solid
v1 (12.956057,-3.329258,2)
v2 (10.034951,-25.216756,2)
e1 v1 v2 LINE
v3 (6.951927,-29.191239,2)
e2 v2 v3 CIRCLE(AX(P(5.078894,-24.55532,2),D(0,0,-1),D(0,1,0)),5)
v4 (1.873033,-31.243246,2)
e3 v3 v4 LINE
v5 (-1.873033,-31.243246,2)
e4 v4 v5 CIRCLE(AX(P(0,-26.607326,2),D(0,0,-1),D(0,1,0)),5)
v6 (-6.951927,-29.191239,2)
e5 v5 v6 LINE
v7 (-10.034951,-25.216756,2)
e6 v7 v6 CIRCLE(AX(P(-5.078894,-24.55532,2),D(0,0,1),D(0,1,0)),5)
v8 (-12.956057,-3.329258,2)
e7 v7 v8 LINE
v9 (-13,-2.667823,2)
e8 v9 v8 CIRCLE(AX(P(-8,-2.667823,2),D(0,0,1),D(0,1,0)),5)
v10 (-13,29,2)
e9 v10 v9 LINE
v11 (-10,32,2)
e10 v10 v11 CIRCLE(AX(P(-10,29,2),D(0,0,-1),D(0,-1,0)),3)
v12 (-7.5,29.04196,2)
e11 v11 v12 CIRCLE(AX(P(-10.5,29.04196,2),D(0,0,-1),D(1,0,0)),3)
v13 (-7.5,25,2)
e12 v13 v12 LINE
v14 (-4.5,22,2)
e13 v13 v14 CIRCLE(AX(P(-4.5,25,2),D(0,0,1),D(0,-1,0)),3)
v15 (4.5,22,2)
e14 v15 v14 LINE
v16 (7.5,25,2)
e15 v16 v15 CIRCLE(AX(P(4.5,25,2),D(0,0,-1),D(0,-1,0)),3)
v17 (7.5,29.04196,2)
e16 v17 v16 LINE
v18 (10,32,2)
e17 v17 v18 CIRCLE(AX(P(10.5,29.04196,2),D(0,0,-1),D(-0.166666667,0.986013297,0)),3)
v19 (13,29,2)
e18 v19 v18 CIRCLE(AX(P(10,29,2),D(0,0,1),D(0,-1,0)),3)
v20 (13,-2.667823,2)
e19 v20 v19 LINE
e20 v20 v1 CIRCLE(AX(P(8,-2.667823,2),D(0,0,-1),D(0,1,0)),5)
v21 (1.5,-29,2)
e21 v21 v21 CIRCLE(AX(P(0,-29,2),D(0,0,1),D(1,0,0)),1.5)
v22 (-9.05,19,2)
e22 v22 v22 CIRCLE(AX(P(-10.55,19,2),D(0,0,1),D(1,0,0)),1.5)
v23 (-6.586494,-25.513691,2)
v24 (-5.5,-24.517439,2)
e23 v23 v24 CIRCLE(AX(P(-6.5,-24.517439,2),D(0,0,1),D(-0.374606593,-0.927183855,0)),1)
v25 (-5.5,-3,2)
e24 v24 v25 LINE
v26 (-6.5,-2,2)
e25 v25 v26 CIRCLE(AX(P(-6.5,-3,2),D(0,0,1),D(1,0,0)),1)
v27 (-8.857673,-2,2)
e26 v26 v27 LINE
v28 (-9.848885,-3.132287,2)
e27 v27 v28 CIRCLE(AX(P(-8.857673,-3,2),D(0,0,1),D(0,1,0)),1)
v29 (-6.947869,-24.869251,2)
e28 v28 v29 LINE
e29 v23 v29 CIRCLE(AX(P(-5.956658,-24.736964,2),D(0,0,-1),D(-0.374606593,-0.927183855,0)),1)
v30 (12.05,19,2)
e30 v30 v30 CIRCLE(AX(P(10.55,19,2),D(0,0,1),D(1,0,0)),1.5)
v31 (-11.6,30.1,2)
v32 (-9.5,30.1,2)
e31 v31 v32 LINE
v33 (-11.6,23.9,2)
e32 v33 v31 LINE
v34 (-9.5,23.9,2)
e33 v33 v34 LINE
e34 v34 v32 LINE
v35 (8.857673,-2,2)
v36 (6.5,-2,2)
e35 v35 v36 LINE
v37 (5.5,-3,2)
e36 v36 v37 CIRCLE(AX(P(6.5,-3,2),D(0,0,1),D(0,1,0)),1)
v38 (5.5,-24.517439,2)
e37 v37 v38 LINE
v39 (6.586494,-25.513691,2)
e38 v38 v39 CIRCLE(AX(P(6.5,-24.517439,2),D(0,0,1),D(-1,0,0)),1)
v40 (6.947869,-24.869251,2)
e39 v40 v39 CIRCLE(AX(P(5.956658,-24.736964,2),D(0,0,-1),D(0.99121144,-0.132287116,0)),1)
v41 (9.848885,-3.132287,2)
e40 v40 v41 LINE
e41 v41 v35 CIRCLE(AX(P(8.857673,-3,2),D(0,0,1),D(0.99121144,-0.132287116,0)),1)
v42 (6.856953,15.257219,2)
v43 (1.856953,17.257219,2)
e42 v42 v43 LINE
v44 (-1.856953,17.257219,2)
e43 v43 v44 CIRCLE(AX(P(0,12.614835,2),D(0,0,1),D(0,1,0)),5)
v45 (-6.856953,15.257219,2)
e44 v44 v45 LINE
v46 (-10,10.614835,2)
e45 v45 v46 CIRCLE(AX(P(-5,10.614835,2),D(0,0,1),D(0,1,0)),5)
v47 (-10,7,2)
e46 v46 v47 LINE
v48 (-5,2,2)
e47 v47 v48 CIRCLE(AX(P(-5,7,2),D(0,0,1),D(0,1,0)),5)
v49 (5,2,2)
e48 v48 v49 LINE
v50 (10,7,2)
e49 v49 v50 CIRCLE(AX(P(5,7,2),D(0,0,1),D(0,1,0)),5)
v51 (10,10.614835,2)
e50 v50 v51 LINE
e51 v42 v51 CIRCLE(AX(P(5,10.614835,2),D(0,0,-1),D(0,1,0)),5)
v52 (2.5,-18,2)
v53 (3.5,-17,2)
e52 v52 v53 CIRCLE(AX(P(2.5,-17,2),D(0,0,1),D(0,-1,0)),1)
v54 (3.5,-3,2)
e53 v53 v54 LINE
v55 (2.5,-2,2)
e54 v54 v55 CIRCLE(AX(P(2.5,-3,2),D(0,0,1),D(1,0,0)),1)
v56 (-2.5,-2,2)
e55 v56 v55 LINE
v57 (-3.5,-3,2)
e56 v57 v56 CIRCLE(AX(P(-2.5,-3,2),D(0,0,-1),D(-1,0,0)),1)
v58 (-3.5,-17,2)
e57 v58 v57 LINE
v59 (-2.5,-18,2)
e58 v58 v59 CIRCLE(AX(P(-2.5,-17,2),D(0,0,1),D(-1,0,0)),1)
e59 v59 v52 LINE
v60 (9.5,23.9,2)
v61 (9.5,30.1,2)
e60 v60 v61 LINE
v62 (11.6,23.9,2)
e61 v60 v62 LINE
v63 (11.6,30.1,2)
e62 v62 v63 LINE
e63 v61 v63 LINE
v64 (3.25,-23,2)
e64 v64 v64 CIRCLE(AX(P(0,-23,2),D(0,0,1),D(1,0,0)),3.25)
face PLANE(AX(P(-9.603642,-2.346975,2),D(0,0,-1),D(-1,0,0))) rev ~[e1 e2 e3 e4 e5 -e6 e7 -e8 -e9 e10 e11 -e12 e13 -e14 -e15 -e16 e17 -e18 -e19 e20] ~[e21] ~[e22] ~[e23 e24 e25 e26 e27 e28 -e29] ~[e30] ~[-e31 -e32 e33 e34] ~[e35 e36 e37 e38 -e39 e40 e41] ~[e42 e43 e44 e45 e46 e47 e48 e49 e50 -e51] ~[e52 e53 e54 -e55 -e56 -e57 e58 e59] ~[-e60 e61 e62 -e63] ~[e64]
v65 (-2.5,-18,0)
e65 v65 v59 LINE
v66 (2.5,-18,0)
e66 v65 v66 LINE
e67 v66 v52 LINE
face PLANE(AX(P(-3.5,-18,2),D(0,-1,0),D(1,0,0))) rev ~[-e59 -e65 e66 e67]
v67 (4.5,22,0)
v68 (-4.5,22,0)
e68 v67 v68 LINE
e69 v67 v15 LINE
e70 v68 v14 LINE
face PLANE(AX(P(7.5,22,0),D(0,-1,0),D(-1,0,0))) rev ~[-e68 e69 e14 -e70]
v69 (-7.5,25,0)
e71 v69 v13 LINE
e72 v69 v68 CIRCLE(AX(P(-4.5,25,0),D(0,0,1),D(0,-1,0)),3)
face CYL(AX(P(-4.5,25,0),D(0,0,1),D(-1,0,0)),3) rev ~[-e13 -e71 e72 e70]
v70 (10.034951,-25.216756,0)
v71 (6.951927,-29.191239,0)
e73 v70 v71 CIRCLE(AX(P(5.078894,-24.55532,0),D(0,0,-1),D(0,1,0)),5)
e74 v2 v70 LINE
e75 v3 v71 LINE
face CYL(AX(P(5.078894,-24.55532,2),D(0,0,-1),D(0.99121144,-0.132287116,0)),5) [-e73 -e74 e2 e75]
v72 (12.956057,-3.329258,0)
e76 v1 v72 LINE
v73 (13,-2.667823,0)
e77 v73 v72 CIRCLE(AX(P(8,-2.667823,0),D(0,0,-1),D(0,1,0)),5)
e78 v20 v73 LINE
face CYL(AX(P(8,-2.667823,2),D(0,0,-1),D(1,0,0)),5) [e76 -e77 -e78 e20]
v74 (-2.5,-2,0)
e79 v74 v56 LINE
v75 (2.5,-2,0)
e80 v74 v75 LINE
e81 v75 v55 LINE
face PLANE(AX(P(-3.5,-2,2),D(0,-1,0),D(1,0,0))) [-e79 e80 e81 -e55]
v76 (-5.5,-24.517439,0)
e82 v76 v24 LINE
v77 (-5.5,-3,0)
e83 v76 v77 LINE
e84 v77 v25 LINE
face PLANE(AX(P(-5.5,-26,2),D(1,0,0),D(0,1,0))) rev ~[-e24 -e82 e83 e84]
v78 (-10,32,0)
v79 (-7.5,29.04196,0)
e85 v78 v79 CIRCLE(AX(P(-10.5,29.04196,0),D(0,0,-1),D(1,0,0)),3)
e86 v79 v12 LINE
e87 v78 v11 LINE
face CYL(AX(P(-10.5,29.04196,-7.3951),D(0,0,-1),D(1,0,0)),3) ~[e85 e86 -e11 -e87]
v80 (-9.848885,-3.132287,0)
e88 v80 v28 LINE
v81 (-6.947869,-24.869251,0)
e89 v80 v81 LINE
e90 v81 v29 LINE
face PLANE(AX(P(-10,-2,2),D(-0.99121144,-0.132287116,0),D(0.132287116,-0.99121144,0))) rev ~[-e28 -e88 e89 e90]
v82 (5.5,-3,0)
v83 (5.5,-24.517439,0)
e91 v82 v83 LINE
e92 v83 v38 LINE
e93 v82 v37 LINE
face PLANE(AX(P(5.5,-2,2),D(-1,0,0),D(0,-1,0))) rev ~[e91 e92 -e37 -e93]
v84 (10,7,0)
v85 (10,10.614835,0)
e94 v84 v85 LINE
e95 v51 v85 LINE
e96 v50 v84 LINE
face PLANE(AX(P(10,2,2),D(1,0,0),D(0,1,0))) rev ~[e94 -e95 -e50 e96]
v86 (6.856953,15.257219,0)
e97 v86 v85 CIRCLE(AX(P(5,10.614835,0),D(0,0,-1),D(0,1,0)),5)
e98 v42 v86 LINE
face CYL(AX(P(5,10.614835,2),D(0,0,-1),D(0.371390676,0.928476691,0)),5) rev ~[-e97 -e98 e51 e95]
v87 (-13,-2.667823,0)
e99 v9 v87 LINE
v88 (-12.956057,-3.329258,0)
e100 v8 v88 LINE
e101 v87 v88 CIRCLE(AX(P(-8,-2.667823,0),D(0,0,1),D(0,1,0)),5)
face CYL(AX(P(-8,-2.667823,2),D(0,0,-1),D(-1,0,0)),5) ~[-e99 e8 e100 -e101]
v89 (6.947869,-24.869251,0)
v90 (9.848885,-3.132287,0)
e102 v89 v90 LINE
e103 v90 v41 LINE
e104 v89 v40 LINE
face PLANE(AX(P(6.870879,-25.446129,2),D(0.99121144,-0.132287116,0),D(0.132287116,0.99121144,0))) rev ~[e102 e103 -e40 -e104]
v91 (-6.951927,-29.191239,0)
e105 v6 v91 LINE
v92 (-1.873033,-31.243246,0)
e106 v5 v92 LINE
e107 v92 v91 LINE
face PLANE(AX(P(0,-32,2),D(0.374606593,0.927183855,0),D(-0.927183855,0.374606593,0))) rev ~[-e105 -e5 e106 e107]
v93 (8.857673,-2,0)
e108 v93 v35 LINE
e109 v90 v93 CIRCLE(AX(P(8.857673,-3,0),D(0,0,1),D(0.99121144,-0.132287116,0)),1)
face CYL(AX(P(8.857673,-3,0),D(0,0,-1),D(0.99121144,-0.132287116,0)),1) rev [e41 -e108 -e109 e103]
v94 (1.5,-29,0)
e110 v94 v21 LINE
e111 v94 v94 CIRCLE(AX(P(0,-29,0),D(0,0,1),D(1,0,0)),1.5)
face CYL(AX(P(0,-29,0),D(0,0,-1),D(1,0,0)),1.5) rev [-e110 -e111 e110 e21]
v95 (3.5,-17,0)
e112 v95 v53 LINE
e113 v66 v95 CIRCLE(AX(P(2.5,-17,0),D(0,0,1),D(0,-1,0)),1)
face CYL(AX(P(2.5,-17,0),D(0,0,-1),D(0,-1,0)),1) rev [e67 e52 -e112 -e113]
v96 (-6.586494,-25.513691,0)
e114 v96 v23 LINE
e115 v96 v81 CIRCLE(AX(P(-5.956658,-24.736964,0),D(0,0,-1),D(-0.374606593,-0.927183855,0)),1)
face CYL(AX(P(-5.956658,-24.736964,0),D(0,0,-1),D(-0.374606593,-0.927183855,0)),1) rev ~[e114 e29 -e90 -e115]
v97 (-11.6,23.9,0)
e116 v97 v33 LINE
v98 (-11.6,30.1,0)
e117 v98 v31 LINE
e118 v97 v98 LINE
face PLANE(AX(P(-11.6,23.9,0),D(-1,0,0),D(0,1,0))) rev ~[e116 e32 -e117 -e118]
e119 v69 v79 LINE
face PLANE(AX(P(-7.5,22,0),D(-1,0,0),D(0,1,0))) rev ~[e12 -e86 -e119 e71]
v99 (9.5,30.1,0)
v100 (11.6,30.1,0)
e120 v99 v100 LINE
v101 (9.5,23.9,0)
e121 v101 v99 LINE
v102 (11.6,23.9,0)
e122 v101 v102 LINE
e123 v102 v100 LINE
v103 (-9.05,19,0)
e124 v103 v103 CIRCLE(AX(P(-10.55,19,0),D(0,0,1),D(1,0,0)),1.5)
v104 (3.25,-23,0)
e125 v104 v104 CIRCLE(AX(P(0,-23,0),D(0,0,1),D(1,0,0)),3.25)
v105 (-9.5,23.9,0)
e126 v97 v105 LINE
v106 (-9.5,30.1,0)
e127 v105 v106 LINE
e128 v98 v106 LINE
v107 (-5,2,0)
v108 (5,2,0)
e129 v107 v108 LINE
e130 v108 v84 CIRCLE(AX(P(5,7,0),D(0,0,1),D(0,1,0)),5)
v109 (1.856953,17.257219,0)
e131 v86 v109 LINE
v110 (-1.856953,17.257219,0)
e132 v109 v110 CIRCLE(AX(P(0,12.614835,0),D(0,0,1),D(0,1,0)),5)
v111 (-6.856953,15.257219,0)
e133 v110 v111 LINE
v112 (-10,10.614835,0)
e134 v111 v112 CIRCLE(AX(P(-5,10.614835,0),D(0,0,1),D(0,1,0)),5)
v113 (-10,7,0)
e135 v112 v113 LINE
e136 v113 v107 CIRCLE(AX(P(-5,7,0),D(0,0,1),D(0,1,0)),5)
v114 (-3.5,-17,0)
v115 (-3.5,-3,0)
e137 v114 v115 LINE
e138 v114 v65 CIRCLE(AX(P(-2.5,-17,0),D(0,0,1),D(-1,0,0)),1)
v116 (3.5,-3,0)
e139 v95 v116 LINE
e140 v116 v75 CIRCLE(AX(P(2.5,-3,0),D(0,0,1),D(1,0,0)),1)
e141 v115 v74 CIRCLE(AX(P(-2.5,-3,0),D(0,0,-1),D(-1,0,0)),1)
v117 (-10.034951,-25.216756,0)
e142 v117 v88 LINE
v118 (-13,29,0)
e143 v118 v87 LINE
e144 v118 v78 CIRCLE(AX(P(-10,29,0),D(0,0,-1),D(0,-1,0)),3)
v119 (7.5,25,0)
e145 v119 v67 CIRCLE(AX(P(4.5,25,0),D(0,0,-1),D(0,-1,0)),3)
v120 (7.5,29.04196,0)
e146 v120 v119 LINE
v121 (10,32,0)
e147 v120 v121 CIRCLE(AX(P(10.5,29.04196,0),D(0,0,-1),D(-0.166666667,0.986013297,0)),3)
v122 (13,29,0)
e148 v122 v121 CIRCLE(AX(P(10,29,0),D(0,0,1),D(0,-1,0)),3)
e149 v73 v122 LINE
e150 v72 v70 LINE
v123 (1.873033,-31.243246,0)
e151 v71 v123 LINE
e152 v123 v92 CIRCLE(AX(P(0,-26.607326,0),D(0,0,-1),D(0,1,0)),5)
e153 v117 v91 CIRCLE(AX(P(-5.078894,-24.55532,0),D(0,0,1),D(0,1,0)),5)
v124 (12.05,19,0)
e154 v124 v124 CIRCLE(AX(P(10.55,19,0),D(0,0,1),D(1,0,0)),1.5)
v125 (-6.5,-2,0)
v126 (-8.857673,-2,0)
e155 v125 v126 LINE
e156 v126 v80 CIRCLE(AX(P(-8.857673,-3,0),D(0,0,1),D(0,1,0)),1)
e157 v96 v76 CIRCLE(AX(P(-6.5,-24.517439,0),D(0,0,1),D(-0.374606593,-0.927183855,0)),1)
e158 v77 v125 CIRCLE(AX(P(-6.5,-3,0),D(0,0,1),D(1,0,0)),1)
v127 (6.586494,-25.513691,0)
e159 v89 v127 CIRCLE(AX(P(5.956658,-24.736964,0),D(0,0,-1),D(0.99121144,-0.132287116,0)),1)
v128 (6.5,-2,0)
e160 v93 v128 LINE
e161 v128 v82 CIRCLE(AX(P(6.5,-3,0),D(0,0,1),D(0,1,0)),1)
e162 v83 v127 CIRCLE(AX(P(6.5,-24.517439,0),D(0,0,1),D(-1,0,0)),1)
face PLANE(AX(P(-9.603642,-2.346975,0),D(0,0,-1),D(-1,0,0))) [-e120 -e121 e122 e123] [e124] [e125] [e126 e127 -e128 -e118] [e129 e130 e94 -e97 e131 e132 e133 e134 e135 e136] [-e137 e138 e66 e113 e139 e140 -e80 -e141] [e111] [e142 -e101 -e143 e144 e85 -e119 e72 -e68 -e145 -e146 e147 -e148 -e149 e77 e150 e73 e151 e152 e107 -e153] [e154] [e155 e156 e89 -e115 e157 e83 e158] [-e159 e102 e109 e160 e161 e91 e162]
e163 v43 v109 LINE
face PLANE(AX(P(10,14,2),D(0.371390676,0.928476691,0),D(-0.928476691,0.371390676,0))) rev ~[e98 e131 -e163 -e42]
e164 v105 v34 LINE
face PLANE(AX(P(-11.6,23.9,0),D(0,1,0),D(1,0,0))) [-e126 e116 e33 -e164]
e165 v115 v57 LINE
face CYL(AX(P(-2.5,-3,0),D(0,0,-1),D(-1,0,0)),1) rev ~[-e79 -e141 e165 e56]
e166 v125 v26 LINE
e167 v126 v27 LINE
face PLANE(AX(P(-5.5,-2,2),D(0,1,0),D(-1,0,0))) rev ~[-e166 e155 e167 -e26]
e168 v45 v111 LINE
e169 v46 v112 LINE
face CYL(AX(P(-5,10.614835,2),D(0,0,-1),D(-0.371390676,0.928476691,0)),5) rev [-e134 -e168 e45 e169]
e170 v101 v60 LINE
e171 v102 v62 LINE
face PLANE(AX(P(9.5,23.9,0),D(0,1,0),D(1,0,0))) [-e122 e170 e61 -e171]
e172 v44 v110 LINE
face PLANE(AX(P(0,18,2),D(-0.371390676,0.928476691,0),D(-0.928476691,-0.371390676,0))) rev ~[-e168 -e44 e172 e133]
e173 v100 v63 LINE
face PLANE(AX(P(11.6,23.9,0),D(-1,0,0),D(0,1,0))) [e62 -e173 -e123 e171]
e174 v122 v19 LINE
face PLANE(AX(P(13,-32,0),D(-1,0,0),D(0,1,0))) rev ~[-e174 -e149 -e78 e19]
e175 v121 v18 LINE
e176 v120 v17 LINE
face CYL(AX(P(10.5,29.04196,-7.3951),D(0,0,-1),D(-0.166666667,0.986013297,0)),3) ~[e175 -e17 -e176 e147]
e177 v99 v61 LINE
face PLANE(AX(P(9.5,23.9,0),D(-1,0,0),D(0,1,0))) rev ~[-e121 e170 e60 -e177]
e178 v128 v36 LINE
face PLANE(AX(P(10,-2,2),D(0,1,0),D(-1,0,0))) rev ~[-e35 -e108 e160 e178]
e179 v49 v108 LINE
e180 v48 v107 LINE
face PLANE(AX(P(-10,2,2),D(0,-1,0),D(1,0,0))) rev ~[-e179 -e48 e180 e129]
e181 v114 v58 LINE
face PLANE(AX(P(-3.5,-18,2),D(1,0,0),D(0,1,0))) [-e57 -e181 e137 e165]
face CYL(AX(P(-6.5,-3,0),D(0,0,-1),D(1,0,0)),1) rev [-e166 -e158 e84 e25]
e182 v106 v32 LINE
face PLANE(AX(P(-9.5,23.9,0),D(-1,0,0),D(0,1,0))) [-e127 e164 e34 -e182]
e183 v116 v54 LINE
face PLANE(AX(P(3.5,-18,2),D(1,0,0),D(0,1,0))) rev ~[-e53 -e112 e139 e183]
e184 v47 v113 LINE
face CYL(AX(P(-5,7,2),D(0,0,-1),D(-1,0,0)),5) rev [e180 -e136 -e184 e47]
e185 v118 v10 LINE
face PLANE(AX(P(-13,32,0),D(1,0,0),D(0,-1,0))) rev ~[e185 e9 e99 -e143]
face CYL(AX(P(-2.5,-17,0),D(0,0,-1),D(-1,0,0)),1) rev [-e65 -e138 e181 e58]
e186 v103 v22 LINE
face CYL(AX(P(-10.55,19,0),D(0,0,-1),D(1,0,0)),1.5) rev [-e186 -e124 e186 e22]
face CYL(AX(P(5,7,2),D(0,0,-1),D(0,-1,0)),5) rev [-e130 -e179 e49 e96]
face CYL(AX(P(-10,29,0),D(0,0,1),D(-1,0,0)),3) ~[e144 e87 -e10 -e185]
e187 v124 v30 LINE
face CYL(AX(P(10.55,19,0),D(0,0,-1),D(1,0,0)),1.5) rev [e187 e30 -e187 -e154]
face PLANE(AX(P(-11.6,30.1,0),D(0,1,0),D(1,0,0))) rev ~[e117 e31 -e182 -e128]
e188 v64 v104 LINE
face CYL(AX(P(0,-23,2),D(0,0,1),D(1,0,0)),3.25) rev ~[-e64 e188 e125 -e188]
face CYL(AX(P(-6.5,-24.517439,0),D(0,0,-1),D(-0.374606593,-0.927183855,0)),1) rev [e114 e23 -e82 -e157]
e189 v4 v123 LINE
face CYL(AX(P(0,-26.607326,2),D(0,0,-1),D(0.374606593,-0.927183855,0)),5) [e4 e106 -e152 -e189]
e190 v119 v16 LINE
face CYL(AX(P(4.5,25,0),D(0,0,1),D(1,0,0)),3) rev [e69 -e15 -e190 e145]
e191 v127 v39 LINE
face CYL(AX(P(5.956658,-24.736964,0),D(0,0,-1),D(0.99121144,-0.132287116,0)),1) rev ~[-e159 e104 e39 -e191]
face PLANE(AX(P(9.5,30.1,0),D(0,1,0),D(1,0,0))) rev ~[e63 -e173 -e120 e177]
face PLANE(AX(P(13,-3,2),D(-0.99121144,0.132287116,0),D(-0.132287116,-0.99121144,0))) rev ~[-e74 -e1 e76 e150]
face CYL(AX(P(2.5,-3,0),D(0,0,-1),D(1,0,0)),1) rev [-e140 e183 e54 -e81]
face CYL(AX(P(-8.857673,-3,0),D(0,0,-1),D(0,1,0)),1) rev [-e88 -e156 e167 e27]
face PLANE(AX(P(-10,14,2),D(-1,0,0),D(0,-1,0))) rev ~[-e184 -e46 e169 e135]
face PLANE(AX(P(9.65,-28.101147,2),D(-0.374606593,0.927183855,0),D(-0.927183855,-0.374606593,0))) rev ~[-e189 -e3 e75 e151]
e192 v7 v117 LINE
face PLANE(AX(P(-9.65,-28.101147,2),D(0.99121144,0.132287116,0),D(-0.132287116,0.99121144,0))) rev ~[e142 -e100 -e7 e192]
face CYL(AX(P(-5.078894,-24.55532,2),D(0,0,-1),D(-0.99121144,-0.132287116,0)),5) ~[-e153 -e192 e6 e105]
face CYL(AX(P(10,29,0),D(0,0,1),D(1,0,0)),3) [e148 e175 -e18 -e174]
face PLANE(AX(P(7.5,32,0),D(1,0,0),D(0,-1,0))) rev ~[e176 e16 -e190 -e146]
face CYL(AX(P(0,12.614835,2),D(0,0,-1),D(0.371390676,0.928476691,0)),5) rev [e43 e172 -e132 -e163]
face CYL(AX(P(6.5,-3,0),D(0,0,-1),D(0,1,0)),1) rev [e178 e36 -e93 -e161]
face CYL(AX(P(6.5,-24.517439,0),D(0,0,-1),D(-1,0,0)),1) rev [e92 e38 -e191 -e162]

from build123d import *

# Parameters (mm, degrees)
F0_R         = 1.5
F0_W         = 2.1
F0_H         = 6.2
F1_DEPTH     = 2
F2_R         = 3
F4_DEPTH     = 2.001
F5_R         = 5
F6_T1_DEPTH  = 16.7901994578
F7_W         = 7
F7_H         = 16
F7_R         = 3.25
F8_DEPTH     = 2.001
F9_R         = 5
F10_T1_DEPTH = 2


# Not quite as in the source:
# - a fillet or chamfer that OpenCascade refuses, or shapes differently, is made with other operations: its cross-section is extruded or revolved along the edge and cut away or added


with BuildPart() as f1:
    # F0 (on Top) → F1 (new body)
    with BuildSketch(Plane.XY):
        Polygon((-13, -32), (13, -32), (13, 32), (7.5, 32), (7.5, 22), (-7.5, 22), (-7.5, 32), (-13, 32), align=None)
        with Locations((0, -29)):
            Circle(F0_R, mode=Mode.SUBTRACT)
        with Locations((-10.55, 19)):
            Circle(F0_R, mode=Mode.SUBTRACT)
        with Locations((-10.55, 27)):
            Rectangle(F0_W, F0_H, mode=Mode.SUBTRACT)
        with Locations((10.55, 19)):
            Circle(F0_R, mode=Mode.SUBTRACT)
        with Locations((10.55, 27)):
            Rectangle(F0_W, F0_H, mode=Mode.SUBTRACT)
    extrude(amount=F1_DEPTH)

    # F2
    f2_edges = [f1.edges().sort_by_distance(p)[0] for p in [
        (13, 32, 1),
        (7.5, 22, 1),
        (-7.5, 22, 1),
        (-13, 32, 1),
    ]]
    fillet(f2_edges, radius=F2_R)

    # F3 (on face) → F4 (cut, through all)
    with BuildSketch(Plane.XY.offset(2)):
        Polygon((-9.65, -28.1011469207), (-13, -3), (-13, -33), (13, -33), (13, -3), (9.65, -28.1011469207), (0, -32), align=None)
    extrude(amount=-F4_DEPTH, mode=Mode.SUBTRACT)

    # F5
    f5_edges = [f1.edges().sort_by_distance(p)[0] for p in [
        (9.65, -28.101147, 1),
        (-9.65, -28.101147, 1),
        (13, -3, 1),
        (0, -32, 1),
        (-13, -3, 1),
    ]]
    fillet(f5_edges, radius=F5_R)

    # F6: fillet of radius 3 on 2 edges, made by hand

    # F6_s2 → F6_t1 (cut)
    with BuildSketch(Plane.XY.offset(-7.3950997289)):
        with BuildLine():
            ThreePointArc((-7.5, 29.0419601084), (-8.2087121525, 30.9784517816), (-10, 32))
            Line((-10, 32), (-7.5, 32))
            Line((-7.5, 32), (-7.5, 29.0419601084))
        make_face()
        with BuildLine():
            ThreePointArc((10, 32), (8.2087121525, 30.9784517816), (7.5, 29.0419601084))
            Line((7.5, 29.0419601084), (7.5, 32))
            Line((7.5, 32), (10, 32))
        make_face()
    extrude(amount=F6_T1_DEPTH, mode=Mode.SUBTRACT)

    # F7 (on face) → F8 (cut, through all)
    with BuildSketch(Plane.XY.offset(2)):
        Polygon((10, 14), (0, 18), (-10, 14), (-10, 2), (10, 2), align=None)
        Polygon((-5.5, -2), (-10, -2), (-6.8708787487, -25.4461290331), (-5.5, -26), align=None)
        Polygon((6.8708787487, -25.4461290331), (10, -2), (5.5, -2), (5.5, -26), align=None)
        with Locations((0, -10)):
            Rectangle(F7_W, F7_H)
        with Locations((0, -23)):
            Circle(F7_R)
    extrude(amount=-F8_DEPTH, mode=Mode.SUBTRACT)

    # F9
    f9_edges = [f1.edges().sort_by_distance(p)[0] for p in [
        (-10, 14, 1),
        (0, 18, 1),
        (10, 14, 1),
        (-10, 2, 1),
        (10, 2, 1),
    ]]
    fillet(f9_edges, radius=F9_R)

    # F10: fillet of radius 1 on 12 edges, made by hand

    # F10_s2 → F10_t1 (join)
    with BuildSketch(Plane.XY):
        with BuildLine():
            ThreePointArc((-8.8576734794, -2), (-9.6100985971, -2.3413222015), (-9.8488849195, -3.1322871156))
            Line((-9.8488849195, -3.1322871156), (-10, -2))
            Line((-10, -2), (-8.8576734794, -2))
        make_face()
        with BuildLine():
            ThreePointArc((-3.5, -3), (-3.2071067812, -2.2928932188), (-2.5, -2))
            Line((-2.5, -2), (-3.5, -2))
            Line((-3.5, -2), (-3.5, -3))
        make_face()
        with BuildLine():
            ThreePointArc((6.5, -2), (5.7928932188, -2.2928932188), (5.5, -3))
            Line((5.5, -3), (5.5, -2))
            Line((5.5, -2), (6.5, -2))
        make_face()
        with BuildLine():
            ThreePointArc((-5.5, -3), (-5.7928932188, -2.2928932188), (-6.5, -2))
            Line((-6.5, -2), (-5.5, -2))
            Line((-5.5, -2), (-5.5, -3))
        make_face()
        with BuildLine():
            ThreePointArc((3.5, -3), (3.2071067812, -2.2928932188), (2.5, -2))
            Line((2.5, -2), (3.5, -2))
            Line((3.5, -2), (3.5, -3))
        make_face()
        with BuildLine():
            ThreePointArc((9.8488849195, -3.1322871156), (9.6100985971, -2.3413222015), (8.8576734794, -2))
            Line((8.8576734794, -2), (10, -2))
            Line((10, -2), (9.8488849195, -3.1322871156))
        make_face()
        with BuildLine():
            ThreePointArc((-3.5, -17), (-3.2071067812, -17.7071067812), (-2.5, -18))
            Line((-2.5, -18), (-3.5, -18))
            Line((-3.5, -18), (-3.5, -17))
        make_face()
        with BuildLine():
            ThreePointArc((2.5, -18), (3.2071067812, -17.7071067812), (3.5, -17))
            Line((3.5, -17), (3.5, -18))
            Line((3.5, -18), (2.5, -18))
        make_face()
        with BuildLine():
            ThreePointArc((-6.3312640971, -25.6641475042), (-6.7468030166, -25.3498829497), (-6.9478689438, -24.8692507652))
            Line((-6.9478689438, -24.8692507652), (-6.8708787487, -25.4461290331))
            Line((-6.8708787487, -25.4461290331), (-6.3312640971, -25.6641475042))
        make_face()
        with BuildLine():
            ThreePointArc((6.9478689438, -24.8692507652), (6.7468030166, -25.3498829497), (6.3312640971, -25.6641475042))
            Line((6.3312640971, -25.6641475042), (6.8708787487, -25.4461290331))
            Line((6.8708787487, -25.4461290331), (6.9478689438, -24.8692507652))
        make_face()
        with BuildLine():
            ThreePointArc((5.5, -24.5174390315), (5.9408070965, -25.346476604), (6.8746065934, -25.4446228861))
            Line((6.8746065934, -25.4446228861), (5.5, -26))
            Line((5.5, -26), (5.5, -24.5174390315))
        make_face()
        with BuildLine():
            ThreePointArc((-6.8746065934, -25.4446228861), (-5.9408070965, -25.346476604), (-5.5, -24.5174390315))
            Line((-5.5, -24.5174390315), (-5.5, -26))
            Line((-5.5, -26), (-6.8746065934, -25.4446228861))
        make_face()
    extrude(amount=F10_T1_DEPTH)


solid = f1.part
